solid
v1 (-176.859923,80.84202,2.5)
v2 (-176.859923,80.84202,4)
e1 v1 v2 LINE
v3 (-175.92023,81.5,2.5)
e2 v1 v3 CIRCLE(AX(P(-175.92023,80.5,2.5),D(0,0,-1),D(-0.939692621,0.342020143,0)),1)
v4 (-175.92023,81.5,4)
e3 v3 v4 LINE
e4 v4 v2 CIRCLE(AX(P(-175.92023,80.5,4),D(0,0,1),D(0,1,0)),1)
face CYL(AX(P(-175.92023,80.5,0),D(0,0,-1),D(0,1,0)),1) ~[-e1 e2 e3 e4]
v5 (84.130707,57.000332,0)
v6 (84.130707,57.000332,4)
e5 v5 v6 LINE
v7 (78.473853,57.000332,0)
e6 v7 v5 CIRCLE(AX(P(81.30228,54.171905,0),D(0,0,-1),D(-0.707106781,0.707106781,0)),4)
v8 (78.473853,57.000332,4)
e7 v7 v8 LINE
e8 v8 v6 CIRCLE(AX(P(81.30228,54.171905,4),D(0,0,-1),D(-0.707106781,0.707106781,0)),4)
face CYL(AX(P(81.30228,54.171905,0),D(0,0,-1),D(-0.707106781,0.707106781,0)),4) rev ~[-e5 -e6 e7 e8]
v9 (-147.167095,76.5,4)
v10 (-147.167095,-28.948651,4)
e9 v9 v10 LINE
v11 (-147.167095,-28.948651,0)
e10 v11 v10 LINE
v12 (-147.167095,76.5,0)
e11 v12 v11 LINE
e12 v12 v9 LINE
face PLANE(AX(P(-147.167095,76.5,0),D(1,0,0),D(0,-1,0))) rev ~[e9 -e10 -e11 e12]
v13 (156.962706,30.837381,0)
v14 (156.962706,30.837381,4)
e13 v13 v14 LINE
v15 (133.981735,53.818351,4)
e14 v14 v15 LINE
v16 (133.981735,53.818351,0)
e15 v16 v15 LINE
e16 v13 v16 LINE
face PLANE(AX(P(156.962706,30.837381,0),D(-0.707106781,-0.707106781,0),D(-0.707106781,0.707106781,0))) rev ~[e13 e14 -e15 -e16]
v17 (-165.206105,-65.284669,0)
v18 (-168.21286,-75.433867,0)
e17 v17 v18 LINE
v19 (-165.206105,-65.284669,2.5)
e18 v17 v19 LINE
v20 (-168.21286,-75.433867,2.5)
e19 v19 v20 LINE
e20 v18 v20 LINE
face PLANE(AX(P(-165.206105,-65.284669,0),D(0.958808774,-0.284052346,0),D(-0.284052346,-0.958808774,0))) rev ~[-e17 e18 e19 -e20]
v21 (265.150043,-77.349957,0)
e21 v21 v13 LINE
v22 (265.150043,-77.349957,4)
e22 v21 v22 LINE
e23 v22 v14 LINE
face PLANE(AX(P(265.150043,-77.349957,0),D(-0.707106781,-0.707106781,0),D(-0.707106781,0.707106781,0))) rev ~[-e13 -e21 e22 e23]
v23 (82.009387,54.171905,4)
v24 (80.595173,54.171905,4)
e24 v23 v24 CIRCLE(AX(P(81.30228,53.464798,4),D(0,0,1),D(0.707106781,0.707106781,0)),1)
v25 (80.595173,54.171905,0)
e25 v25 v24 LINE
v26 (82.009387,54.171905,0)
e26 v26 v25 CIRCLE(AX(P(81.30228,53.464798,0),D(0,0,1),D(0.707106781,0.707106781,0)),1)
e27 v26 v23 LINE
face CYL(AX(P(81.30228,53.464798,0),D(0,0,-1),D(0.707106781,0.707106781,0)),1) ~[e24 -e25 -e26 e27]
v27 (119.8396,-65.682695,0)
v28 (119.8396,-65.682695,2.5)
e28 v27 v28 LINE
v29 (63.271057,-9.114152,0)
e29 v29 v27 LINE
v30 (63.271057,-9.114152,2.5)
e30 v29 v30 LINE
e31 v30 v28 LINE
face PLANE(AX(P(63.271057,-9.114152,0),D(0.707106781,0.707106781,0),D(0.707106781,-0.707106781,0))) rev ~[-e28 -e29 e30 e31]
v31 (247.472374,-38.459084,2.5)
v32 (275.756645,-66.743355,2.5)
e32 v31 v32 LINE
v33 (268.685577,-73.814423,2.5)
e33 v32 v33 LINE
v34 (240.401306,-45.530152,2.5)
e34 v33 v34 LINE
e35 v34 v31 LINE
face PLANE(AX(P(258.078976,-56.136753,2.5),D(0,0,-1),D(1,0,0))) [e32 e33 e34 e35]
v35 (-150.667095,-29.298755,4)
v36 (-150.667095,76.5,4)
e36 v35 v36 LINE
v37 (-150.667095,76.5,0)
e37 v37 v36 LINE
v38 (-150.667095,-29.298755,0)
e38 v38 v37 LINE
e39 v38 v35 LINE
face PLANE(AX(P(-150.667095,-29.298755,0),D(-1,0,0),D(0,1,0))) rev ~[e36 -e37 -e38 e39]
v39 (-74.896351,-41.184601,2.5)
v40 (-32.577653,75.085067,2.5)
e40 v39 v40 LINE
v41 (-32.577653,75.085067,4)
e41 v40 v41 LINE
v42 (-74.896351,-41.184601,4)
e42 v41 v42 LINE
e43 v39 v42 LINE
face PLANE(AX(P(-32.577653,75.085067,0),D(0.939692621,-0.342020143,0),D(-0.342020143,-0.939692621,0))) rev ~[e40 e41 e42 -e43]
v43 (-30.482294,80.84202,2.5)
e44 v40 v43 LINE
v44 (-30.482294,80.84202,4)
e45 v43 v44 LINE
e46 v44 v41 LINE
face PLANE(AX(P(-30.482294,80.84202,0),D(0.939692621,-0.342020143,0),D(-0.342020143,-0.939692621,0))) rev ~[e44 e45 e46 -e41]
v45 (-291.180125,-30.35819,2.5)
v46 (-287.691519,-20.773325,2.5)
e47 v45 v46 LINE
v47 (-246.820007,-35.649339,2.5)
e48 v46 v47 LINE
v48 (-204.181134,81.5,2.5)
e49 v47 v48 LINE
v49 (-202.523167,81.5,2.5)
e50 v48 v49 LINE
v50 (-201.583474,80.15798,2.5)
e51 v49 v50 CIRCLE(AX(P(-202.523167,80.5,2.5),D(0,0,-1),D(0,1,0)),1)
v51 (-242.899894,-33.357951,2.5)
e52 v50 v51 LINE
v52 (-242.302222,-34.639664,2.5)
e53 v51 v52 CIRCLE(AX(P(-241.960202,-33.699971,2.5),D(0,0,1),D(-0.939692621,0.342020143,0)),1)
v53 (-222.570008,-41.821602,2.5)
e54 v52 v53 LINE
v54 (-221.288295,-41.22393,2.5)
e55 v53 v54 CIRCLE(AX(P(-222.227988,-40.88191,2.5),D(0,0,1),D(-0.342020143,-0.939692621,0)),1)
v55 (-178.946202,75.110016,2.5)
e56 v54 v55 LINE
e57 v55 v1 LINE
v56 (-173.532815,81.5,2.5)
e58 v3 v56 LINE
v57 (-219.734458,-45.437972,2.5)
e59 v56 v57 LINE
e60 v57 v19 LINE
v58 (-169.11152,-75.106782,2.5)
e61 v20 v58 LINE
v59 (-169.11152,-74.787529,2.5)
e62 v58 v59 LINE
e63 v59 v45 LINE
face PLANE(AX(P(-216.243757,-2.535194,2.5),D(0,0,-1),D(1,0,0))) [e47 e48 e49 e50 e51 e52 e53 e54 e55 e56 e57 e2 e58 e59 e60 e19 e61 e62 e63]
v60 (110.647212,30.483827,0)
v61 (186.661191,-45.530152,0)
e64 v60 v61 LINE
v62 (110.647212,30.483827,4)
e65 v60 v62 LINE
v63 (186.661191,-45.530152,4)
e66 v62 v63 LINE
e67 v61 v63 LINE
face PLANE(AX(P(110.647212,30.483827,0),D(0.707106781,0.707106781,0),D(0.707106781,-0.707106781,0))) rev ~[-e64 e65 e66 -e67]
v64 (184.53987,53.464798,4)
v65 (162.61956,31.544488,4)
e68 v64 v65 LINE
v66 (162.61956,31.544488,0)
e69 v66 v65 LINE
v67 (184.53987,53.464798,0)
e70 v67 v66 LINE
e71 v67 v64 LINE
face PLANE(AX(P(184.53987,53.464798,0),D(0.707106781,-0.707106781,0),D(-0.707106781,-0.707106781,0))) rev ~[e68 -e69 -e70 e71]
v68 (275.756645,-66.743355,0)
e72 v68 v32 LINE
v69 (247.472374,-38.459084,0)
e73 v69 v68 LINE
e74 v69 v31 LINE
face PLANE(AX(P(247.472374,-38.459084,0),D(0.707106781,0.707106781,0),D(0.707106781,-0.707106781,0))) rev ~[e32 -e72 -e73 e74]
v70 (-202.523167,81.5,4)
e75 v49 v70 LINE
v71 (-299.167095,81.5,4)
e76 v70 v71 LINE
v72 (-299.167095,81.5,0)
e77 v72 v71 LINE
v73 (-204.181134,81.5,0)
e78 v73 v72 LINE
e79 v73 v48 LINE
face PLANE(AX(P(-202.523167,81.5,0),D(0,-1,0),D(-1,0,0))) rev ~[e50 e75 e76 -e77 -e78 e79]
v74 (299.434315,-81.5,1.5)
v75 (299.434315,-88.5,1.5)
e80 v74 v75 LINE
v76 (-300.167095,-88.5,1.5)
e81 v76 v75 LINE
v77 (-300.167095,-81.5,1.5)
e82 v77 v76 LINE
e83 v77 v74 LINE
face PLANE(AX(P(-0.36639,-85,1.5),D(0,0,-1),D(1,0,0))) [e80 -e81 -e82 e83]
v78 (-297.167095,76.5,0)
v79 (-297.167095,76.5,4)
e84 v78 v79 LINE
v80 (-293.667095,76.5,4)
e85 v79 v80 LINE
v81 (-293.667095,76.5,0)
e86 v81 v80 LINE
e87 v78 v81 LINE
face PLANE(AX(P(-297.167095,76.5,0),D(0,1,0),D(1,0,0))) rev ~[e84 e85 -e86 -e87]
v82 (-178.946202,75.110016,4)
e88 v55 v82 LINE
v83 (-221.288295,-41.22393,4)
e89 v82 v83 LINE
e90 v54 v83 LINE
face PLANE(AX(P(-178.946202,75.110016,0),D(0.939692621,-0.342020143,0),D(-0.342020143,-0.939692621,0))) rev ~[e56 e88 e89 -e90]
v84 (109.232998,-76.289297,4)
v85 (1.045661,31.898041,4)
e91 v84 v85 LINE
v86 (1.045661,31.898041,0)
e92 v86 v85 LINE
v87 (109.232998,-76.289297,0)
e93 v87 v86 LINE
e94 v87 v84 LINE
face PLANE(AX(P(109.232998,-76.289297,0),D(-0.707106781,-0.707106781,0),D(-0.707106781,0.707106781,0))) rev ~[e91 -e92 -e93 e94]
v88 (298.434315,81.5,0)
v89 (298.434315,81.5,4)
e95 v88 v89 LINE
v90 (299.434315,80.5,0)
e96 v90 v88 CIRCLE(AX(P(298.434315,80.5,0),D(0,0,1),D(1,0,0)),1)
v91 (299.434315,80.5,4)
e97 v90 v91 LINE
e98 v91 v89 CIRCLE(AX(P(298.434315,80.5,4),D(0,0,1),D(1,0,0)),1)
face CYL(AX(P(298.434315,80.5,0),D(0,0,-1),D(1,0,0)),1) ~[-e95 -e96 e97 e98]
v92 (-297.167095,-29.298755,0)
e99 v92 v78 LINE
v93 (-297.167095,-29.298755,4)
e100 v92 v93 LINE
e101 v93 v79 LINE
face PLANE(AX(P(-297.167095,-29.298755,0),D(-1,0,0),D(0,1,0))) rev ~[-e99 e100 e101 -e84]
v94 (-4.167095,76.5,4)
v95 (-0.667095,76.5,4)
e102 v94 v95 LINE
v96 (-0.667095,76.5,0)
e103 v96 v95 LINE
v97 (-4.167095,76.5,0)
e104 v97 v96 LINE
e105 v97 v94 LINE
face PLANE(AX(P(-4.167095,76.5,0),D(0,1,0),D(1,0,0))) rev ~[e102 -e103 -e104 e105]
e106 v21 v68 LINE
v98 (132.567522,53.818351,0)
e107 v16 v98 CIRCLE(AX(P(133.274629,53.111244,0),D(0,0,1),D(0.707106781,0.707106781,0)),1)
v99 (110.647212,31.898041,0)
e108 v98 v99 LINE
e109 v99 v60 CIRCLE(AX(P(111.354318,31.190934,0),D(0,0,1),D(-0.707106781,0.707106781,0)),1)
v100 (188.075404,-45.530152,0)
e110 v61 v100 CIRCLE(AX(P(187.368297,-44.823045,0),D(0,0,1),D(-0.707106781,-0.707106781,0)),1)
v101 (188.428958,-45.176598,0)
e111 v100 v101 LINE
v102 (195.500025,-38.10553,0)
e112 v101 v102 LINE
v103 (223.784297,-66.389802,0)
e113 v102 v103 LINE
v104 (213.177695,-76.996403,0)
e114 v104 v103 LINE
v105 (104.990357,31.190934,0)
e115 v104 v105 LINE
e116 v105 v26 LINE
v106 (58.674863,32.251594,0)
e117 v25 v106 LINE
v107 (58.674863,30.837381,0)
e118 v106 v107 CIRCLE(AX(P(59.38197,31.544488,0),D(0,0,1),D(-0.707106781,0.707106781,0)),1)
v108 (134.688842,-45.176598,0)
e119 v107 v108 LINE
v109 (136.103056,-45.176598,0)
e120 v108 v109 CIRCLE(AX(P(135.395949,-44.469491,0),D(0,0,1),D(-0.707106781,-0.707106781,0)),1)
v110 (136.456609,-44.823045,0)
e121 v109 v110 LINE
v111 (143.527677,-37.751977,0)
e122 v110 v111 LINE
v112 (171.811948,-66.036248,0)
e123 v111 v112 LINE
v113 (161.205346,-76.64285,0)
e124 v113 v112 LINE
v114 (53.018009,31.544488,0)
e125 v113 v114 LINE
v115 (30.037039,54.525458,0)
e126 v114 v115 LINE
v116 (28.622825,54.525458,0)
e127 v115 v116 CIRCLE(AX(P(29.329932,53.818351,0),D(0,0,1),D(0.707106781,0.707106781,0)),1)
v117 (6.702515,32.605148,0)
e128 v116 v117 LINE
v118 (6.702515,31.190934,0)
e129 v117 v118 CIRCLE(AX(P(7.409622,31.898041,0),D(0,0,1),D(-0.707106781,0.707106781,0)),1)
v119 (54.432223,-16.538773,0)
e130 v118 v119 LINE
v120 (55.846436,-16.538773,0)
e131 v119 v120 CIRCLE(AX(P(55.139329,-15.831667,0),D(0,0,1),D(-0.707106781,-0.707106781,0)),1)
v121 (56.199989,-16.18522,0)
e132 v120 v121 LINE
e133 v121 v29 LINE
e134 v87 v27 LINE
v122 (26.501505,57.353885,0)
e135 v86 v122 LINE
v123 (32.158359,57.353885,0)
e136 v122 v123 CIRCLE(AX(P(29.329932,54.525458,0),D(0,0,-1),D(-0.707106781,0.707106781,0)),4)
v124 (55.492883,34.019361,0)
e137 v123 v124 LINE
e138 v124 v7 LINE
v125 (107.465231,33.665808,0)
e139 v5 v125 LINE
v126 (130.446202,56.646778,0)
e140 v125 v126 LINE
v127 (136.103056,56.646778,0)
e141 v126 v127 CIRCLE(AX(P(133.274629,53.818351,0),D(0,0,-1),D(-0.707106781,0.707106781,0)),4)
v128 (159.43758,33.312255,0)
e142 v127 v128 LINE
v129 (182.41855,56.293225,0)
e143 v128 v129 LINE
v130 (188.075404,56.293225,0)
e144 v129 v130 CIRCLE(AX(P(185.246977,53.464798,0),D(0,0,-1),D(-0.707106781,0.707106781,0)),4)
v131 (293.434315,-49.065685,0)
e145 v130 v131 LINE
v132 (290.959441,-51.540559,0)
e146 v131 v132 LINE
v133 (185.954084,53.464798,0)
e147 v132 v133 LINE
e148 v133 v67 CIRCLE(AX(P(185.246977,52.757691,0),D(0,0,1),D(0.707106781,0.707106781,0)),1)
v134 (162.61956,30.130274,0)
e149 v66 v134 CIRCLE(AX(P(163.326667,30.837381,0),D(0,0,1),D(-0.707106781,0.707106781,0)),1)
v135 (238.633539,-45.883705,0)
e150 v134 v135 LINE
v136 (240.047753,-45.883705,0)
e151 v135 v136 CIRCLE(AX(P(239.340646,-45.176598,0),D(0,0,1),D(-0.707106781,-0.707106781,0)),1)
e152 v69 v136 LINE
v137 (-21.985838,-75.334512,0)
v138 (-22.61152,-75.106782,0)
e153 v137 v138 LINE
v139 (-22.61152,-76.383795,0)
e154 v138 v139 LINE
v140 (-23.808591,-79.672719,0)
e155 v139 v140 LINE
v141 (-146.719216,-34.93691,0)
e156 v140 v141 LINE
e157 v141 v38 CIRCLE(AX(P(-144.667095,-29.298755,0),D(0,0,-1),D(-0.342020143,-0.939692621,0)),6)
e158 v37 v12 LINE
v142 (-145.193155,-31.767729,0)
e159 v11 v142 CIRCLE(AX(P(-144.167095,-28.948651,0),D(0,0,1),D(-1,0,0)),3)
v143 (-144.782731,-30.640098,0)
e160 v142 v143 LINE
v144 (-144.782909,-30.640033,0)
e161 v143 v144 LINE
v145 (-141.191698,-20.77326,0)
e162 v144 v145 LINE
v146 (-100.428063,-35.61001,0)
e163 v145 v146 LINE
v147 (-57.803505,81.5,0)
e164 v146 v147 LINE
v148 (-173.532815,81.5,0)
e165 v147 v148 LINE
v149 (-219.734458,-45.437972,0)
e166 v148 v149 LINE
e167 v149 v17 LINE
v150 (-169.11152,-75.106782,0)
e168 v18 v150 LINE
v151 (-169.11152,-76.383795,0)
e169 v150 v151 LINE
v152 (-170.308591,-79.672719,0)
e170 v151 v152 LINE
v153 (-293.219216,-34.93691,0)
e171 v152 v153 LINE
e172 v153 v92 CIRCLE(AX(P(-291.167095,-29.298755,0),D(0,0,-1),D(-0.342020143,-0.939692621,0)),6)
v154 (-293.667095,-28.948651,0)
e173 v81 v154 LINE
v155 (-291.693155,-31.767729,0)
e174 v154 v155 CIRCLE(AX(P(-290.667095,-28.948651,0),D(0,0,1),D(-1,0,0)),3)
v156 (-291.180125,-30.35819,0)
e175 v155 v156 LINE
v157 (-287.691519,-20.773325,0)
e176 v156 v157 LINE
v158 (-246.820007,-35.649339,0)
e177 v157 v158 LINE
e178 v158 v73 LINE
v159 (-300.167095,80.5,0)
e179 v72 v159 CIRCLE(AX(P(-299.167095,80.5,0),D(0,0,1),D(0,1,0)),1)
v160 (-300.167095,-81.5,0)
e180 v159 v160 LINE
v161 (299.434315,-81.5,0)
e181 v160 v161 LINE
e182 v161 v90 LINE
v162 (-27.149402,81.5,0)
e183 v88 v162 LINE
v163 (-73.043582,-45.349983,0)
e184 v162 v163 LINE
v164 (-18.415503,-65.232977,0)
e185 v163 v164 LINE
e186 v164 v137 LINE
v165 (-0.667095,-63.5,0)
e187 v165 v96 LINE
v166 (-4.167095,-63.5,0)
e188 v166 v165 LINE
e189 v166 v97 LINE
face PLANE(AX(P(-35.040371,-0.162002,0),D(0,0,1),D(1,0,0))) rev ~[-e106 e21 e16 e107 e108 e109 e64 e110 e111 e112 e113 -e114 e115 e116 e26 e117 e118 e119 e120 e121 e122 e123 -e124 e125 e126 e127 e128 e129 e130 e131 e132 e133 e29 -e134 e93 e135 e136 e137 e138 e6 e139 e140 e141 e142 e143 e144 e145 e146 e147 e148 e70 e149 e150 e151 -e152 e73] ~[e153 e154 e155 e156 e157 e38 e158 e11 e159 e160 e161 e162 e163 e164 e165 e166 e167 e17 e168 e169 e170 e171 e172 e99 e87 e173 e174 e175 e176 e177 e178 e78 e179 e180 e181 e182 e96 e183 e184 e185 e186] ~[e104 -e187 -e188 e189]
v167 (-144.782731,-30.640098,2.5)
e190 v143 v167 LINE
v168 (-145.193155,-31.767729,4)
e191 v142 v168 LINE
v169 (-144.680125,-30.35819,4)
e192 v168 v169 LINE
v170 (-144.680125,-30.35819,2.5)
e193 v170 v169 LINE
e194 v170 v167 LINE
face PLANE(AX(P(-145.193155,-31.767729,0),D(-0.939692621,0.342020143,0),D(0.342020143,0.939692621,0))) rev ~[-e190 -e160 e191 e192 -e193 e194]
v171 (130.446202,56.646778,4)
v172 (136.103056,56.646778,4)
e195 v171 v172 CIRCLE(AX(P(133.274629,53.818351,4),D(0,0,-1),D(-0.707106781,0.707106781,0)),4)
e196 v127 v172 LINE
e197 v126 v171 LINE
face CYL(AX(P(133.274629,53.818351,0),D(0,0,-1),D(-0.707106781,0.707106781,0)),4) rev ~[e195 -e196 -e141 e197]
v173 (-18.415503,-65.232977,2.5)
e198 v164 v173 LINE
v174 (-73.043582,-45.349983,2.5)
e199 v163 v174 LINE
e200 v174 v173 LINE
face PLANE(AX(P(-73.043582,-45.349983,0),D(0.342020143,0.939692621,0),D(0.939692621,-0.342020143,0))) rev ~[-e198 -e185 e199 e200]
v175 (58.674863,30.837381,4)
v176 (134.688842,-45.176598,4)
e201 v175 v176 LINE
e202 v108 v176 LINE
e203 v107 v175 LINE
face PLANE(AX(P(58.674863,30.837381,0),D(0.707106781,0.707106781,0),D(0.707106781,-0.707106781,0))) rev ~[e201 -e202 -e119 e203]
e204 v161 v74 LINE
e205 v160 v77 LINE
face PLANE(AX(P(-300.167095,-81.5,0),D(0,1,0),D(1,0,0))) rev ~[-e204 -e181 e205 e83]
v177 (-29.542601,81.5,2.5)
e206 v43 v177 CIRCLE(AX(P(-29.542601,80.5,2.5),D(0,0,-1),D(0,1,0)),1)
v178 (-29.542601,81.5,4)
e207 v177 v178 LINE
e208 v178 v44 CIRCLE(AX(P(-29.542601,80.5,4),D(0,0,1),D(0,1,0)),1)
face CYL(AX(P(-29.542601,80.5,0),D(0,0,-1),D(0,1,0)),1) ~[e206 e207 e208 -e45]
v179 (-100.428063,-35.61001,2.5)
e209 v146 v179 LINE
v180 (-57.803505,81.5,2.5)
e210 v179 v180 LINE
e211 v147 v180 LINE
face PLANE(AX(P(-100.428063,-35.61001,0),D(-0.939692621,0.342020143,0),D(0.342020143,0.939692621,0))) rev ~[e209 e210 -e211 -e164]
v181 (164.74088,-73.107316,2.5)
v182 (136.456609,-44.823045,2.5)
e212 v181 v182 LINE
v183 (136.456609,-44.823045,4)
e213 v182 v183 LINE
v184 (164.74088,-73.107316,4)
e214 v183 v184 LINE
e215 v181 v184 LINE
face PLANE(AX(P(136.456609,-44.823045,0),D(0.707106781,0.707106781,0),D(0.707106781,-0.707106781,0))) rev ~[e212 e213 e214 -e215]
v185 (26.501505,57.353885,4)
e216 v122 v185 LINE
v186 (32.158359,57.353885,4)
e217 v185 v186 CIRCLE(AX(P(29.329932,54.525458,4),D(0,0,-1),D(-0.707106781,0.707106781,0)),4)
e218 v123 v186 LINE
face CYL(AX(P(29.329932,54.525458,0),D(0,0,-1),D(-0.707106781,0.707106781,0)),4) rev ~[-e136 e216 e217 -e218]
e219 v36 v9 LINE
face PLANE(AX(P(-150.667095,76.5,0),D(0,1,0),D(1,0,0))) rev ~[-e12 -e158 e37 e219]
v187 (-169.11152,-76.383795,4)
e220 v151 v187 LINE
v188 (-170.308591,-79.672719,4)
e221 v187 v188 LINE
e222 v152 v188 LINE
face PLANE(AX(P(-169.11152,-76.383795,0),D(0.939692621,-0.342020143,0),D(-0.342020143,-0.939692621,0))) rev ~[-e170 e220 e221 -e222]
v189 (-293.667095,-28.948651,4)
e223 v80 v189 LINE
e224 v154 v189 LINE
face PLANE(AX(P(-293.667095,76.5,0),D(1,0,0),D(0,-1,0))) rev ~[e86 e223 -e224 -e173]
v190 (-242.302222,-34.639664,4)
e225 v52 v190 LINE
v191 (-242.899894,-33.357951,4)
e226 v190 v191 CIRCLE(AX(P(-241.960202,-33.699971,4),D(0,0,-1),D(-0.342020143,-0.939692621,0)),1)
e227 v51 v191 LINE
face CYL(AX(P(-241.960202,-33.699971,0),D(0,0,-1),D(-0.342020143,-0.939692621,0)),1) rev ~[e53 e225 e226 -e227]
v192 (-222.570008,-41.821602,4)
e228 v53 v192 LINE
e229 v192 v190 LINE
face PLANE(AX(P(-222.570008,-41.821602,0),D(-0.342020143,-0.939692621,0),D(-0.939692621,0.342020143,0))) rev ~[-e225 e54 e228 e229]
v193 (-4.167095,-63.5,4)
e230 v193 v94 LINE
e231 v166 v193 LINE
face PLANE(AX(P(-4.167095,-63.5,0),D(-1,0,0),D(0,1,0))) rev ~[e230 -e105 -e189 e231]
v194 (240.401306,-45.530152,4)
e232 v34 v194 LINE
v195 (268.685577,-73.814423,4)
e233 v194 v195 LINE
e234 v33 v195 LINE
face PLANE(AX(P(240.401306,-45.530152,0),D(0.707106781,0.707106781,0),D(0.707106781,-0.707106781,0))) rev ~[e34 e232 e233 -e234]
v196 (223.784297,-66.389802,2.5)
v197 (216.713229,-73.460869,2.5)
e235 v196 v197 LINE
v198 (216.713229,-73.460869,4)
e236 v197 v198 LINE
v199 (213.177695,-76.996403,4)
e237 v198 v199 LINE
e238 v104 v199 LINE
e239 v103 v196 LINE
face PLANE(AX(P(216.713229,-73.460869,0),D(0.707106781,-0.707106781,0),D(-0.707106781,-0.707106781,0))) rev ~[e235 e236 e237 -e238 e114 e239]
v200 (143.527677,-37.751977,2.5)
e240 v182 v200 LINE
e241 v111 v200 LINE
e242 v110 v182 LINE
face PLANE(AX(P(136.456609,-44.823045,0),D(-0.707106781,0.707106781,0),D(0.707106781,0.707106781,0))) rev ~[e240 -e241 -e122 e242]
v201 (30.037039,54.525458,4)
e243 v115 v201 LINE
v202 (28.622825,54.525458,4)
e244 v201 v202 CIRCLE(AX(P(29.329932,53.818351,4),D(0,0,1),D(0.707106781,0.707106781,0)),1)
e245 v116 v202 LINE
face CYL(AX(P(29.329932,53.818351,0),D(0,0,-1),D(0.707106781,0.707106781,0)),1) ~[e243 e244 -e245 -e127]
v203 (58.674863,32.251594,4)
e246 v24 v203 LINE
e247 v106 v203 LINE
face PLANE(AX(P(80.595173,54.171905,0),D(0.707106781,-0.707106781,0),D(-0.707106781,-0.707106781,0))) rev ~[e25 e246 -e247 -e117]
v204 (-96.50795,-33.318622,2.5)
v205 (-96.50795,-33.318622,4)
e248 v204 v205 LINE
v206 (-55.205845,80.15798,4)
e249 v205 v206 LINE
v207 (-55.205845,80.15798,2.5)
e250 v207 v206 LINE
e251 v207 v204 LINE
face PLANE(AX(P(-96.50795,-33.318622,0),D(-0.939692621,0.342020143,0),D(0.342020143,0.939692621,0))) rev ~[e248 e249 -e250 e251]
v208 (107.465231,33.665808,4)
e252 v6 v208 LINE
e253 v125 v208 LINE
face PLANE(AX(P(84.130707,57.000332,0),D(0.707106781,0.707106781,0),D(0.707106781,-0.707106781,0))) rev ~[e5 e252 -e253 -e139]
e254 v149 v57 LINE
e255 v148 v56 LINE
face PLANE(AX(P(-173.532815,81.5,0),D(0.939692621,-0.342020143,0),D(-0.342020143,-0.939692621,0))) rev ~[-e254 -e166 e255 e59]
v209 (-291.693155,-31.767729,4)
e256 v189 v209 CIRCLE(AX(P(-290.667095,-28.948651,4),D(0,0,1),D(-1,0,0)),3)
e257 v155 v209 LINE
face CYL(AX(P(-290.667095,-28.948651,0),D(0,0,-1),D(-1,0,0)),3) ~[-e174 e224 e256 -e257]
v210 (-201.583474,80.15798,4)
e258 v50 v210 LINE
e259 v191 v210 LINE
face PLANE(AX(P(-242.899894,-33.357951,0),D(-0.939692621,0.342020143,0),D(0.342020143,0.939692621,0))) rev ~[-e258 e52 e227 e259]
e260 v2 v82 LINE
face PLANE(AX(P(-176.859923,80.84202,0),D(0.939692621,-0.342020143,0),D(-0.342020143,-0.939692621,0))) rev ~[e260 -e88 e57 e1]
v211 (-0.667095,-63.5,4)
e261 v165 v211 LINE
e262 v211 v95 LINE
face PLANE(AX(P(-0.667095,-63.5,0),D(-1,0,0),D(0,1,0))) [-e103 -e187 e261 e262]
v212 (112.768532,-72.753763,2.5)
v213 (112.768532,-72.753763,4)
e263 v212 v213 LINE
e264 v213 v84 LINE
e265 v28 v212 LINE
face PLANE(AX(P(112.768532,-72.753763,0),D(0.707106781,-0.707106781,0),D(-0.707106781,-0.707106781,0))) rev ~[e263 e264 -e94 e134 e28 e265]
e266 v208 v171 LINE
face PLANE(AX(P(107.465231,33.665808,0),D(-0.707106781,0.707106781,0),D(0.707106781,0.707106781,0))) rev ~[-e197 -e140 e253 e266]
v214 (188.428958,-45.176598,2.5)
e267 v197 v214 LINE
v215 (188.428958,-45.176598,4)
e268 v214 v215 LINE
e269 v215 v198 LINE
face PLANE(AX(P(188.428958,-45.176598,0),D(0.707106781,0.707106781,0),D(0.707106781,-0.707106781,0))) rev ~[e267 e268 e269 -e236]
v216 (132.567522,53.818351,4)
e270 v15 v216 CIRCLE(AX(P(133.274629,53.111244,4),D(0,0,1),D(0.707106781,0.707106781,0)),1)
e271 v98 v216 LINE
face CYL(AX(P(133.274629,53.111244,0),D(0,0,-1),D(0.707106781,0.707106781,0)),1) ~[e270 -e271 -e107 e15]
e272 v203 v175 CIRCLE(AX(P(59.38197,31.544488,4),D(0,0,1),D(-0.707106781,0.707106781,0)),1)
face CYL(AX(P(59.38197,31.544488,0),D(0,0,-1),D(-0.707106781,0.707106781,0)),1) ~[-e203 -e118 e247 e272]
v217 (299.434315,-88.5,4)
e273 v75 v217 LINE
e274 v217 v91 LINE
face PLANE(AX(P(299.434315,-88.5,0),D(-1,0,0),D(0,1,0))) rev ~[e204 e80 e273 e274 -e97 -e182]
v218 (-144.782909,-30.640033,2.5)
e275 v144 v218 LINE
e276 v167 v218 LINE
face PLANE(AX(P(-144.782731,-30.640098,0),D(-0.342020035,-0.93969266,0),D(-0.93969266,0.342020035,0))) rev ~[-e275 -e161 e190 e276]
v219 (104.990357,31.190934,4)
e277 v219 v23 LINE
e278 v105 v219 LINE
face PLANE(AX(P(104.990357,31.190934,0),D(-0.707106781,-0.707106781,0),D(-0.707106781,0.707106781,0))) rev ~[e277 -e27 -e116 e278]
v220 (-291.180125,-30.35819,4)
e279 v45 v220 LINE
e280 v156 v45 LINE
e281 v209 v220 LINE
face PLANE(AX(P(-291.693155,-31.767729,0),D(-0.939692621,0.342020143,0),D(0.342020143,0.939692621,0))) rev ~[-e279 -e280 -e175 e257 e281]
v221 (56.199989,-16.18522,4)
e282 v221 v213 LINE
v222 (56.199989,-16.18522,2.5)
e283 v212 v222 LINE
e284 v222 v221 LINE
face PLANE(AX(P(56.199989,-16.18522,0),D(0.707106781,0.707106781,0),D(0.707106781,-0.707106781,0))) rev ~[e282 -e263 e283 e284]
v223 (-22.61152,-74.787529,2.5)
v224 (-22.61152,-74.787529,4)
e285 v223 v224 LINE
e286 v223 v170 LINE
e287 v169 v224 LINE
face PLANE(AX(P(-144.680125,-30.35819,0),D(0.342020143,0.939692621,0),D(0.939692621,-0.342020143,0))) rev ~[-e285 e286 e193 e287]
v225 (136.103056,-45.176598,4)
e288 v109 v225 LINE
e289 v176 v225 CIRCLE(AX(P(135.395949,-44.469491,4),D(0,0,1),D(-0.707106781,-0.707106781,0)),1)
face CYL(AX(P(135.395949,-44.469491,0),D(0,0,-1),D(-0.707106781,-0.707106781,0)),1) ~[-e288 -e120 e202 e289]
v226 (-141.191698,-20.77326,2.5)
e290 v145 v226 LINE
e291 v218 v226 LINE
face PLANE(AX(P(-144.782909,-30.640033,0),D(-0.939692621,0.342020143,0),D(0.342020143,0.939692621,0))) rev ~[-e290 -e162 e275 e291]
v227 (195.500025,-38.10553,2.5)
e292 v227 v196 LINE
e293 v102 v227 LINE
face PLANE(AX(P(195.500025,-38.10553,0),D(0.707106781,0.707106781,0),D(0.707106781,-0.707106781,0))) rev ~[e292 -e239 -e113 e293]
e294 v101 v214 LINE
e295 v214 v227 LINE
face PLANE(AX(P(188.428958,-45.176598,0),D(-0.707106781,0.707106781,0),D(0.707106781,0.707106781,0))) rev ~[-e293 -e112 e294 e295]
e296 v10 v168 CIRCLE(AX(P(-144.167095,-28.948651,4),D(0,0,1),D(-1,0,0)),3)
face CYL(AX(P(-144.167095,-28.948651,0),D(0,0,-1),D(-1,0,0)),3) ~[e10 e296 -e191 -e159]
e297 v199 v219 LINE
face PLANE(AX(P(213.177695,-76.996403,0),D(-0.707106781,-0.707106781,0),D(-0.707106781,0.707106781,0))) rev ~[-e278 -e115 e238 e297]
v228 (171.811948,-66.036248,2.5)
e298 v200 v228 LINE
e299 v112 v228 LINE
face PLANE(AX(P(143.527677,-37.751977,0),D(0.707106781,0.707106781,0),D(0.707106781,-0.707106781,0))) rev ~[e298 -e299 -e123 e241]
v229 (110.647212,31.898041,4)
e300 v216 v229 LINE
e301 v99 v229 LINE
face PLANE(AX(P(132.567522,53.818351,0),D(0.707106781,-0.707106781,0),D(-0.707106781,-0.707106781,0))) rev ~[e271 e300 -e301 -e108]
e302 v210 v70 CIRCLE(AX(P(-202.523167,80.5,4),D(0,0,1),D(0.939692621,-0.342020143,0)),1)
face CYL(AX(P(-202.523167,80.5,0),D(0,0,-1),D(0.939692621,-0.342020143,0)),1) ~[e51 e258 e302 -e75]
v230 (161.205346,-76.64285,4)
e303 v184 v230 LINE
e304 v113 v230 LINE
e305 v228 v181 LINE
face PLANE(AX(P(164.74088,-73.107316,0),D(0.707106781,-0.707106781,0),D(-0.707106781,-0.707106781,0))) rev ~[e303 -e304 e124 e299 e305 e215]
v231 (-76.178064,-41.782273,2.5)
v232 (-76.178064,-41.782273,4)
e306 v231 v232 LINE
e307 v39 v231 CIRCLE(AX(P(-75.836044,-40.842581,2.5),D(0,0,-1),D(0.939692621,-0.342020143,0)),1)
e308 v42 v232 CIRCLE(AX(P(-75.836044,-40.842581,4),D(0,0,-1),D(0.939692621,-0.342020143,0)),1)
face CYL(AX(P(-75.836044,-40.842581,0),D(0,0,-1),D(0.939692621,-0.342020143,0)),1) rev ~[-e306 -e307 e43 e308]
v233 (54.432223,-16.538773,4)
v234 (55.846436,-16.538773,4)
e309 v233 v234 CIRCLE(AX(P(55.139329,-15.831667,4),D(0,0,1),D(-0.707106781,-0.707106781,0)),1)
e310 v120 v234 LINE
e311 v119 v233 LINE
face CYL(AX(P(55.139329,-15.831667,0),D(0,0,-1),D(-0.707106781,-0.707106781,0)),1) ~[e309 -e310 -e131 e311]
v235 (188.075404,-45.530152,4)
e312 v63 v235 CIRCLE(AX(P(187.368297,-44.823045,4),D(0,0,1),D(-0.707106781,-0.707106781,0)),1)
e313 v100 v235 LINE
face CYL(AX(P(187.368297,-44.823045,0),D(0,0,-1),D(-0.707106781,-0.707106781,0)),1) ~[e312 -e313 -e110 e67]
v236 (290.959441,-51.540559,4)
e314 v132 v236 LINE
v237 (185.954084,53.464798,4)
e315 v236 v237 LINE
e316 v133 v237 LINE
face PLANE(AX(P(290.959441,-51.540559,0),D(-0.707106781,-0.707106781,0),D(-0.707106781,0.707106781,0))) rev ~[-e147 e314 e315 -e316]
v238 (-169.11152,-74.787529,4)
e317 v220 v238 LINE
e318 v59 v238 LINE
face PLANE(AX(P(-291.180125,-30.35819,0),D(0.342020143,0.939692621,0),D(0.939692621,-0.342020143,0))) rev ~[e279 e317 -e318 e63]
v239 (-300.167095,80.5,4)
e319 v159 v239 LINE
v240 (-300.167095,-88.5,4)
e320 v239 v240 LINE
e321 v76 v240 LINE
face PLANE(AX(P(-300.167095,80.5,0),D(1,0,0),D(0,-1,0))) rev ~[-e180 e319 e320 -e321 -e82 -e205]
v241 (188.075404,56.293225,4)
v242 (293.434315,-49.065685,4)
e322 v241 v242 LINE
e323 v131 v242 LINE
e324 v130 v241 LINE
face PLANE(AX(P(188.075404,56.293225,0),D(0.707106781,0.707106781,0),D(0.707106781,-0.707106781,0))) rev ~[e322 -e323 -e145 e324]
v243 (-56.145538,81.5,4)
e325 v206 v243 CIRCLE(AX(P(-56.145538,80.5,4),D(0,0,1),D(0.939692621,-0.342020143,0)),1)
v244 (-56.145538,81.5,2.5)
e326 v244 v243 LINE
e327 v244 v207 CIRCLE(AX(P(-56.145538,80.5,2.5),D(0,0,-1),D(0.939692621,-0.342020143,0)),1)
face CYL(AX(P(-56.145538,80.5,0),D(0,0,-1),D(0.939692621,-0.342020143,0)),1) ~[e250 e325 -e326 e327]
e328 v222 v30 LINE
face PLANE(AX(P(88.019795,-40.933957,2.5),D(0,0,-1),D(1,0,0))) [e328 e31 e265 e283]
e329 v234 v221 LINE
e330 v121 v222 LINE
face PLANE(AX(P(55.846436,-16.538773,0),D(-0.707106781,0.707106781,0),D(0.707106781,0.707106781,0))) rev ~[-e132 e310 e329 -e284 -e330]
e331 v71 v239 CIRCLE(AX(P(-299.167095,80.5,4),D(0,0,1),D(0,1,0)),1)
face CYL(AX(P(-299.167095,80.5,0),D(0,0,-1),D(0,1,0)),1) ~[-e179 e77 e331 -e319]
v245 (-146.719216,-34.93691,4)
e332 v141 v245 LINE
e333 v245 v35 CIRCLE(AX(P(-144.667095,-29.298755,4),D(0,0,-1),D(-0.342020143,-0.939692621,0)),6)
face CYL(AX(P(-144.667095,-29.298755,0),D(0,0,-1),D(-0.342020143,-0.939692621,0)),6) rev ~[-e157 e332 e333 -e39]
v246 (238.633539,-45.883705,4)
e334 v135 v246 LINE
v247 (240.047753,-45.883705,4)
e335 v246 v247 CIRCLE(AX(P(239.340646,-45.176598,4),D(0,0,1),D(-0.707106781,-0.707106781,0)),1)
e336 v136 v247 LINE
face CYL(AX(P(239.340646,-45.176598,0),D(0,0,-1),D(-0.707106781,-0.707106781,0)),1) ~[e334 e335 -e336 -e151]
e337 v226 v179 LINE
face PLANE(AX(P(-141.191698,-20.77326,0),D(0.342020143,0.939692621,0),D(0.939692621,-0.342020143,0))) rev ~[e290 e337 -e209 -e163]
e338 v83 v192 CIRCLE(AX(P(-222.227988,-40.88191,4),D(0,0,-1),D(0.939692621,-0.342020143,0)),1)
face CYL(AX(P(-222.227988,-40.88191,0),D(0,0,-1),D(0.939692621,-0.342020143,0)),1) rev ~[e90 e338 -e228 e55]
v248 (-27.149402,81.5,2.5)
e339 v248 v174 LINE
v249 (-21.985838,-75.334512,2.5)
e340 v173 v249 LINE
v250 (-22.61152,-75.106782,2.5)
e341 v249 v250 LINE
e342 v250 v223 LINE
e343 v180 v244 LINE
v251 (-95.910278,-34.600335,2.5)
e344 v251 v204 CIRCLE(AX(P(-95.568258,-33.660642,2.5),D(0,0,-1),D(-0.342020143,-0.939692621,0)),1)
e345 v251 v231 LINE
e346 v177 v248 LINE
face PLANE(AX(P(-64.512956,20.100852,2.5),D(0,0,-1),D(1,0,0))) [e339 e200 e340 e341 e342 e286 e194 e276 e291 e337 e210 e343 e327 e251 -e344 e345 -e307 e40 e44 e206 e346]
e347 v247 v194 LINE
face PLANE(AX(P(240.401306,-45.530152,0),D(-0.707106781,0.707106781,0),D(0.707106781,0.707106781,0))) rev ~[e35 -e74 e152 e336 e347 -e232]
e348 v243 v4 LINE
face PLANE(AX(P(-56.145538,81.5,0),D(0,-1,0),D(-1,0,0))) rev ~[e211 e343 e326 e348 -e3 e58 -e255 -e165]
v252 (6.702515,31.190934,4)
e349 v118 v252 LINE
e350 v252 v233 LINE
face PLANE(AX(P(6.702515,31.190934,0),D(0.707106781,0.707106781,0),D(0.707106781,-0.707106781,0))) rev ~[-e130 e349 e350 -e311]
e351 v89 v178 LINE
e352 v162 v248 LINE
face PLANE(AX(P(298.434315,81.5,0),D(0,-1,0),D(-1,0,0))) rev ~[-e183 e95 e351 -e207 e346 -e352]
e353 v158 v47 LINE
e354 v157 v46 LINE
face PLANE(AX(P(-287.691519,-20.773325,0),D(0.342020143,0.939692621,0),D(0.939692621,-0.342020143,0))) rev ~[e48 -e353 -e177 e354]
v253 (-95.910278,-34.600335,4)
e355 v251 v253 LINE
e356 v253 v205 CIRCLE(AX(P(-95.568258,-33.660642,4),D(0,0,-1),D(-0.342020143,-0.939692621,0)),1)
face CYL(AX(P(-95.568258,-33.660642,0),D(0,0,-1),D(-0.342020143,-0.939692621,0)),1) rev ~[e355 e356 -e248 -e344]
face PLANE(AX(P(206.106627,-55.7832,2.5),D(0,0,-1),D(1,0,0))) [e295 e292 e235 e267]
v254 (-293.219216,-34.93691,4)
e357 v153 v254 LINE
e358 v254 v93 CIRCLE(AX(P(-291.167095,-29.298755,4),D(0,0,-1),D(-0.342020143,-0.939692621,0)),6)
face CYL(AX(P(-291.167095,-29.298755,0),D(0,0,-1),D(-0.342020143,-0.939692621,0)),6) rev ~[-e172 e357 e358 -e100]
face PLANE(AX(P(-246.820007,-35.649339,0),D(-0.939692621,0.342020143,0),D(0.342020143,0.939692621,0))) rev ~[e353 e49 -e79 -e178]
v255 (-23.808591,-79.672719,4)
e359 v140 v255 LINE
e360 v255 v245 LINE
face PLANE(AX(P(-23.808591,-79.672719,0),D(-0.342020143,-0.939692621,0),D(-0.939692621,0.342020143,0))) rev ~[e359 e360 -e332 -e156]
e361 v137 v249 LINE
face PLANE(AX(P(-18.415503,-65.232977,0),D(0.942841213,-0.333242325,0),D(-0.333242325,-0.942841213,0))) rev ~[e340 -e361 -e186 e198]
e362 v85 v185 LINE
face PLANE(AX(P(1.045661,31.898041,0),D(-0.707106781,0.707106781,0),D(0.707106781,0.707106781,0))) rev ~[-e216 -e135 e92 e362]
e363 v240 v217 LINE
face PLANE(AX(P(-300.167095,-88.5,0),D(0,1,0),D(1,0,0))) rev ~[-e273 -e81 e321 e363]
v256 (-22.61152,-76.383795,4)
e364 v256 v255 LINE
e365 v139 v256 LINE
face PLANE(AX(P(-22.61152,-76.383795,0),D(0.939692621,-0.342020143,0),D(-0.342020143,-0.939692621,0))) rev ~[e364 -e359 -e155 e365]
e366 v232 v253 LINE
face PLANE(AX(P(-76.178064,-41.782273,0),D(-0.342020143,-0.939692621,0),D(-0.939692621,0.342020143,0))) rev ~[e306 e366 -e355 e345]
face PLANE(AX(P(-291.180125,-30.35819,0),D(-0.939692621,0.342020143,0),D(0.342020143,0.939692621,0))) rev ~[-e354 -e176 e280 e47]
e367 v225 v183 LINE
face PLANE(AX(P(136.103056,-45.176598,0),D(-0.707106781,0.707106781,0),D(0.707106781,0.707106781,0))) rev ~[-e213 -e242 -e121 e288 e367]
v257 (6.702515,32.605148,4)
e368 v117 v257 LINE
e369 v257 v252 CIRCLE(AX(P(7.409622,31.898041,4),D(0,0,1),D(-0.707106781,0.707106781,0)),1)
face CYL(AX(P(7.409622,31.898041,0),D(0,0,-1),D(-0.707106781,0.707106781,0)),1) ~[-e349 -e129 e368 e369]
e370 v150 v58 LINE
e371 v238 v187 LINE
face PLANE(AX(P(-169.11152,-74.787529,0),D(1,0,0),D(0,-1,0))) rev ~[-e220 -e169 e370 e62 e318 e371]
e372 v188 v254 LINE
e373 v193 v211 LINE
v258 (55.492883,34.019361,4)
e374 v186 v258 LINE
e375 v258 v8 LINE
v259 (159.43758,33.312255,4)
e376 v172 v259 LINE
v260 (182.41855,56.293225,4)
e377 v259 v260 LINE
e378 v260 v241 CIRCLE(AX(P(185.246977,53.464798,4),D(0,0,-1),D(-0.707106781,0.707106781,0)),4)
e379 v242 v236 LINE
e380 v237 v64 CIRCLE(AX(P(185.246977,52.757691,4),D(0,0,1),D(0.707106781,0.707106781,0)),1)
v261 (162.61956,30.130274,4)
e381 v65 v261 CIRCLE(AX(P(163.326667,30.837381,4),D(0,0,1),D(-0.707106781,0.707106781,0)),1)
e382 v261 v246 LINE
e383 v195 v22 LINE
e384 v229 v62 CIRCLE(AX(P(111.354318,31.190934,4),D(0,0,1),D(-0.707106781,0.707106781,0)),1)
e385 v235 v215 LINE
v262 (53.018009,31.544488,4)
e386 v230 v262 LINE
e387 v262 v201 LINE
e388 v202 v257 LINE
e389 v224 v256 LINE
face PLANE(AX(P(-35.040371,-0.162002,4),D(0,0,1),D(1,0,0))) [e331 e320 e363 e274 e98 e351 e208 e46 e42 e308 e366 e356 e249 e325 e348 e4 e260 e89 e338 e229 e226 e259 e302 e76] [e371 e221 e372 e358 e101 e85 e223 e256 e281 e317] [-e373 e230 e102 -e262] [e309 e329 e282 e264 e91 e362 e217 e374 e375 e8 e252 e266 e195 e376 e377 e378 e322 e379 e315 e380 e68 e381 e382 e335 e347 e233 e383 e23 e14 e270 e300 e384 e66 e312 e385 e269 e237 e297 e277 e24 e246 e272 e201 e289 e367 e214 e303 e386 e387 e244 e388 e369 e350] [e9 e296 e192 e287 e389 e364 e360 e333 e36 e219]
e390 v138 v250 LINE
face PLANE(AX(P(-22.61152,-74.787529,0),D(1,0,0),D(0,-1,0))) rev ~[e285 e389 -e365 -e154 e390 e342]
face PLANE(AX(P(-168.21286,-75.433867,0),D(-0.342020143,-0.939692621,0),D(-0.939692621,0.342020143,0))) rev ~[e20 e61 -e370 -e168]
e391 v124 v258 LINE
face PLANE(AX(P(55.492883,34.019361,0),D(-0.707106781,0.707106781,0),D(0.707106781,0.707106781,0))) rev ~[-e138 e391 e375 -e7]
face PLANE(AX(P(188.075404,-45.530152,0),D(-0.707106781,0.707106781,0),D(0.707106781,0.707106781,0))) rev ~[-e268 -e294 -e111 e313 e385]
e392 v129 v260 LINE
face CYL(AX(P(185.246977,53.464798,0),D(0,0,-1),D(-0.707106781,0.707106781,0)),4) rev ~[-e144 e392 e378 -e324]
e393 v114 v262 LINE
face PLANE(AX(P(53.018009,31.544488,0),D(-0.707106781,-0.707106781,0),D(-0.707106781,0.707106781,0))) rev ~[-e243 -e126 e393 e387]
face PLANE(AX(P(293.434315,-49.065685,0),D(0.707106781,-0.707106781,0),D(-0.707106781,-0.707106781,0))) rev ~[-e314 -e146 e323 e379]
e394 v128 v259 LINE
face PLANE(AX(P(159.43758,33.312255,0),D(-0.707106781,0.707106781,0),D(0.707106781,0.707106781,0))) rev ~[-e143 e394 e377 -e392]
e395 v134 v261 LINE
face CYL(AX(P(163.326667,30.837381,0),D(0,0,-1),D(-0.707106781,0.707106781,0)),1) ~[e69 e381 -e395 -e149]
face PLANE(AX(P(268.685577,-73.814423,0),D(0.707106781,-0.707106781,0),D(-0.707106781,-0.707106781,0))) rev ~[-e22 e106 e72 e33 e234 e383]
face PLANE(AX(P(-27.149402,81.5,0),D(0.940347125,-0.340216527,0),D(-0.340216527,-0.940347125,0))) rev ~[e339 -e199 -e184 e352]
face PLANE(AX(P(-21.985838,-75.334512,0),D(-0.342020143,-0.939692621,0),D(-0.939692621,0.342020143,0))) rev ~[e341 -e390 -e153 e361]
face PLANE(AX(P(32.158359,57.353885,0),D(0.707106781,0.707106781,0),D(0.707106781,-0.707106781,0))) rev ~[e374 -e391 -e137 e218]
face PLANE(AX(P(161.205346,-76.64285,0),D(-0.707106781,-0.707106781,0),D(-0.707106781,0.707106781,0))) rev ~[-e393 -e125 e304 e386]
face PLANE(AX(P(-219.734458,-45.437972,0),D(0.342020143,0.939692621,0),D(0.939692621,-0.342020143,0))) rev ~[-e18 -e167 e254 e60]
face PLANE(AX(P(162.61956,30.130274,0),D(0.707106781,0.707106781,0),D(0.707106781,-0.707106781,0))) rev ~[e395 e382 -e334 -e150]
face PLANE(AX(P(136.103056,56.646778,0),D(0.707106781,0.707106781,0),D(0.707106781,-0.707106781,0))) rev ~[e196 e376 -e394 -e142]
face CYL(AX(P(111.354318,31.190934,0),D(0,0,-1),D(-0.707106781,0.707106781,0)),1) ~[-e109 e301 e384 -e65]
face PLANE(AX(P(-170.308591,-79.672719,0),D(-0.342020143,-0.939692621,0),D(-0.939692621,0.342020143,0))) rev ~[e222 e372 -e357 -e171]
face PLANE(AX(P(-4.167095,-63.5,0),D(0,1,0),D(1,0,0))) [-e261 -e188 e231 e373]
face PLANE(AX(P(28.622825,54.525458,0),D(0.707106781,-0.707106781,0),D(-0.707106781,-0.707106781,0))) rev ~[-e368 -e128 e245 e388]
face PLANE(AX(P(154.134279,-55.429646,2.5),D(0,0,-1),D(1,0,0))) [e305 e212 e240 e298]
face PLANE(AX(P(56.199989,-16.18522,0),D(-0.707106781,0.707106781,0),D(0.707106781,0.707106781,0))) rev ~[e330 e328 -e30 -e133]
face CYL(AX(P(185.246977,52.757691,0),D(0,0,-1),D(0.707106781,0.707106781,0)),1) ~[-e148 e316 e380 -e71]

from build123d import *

# Parameters (mm, degrees)
F0_W     = 3.5
F0_H     = 140
F1_DEPTH = 4
F3_DEPTH = 2.5
F2_W     = 599.6014092535
F2_H     = 7
F4_DEPTH = 1.5


# Not quite as in the source:
# - a feature names something its author has since deleted; it is built from what else it names


with BuildPart() as f1:
    # F0 (on Top) → F1 (new body)
    with BuildSketch(Plane.XY):
        with BuildLine():
            Line((-300.1670946785, -88.5), (299.4343145751, -88.5))
            Line((299.4343145751, -88.5), (299.4343145751, 80.5))
            ThreePointArc((299.4343145751, 80.5), (299.1414213562, 81.2071067812), (298.4343145751, 81.5))
            Line((298.4343145751, 81.5), (-29.5426009536, 81.5))
            ThreePointArc((-29.5426009536, 81.5), (-30.1161773899, 81.3191520443), (-30.4822935744, 80.8420201433))
            Line((-30.4822935744, 80.8420201433), (-32.577653202, 75.0850668809))
            Line((-32.577653202, 75.0850668809), (-74.89635139, -41.1846008115))
            ThreePointArc((-74.89635139, -41.1846008115), (-75.413425749, -41.7488884552), (-76.1780641541, -41.7822732889))
            Line((-76.1780641541, -41.7822732889), (-95.9102779047, -34.6003348275))
            ThreePointArc((-95.9102779047, -34.6003348275), (-96.4745655484, -34.0832604685), (-96.5079503821, -33.3186220634))
            Line((-96.5079503821, -33.3186220634), (-55.2058449976, 80.1579798567))
            ThreePointArc((-55.2058449976, 80.1579798567), (-55.3263855741, 81.0735764364), (-56.1455376183, 81.5))
            Line((-56.1455376183, 81.5), (-175.9202302026, 81.5))
            ThreePointArc((-175.9202302026, 81.5), (-176.4938066389, 81.3191520443), (-176.8599228233, 80.8420201433))
            Line((-176.8599228233, 80.8420201433), (-178.9462015538, 75.1100164406))
            Line((-178.9462015538, 75.1100164406), (-221.2882952976, -41.2239300127))
            ThreePointArc((-221.2882952976, -41.2239300127), (-221.8053696566, -41.7882176564), (-222.5700080617, -41.8216024902))
            Line((-222.5700080617, -41.8216024902), (-242.3022218123, -34.6396640288))
            ThreePointArc((-242.3022218123, -34.6396640288), (-242.866509456, -34.1225896697), (-242.8998942897, -33.3579512647))
            Line((-242.8998942897, -33.3579512647), (-201.5834742465, 80.1579798567))
            ThreePointArc((-201.5834742465, 80.1579798567), (-201.704014823, 81.0735764364), (-202.5231668673, 81.5))
            Line((-202.5231668673, 81.5), (-299.1670946785, 81.5))
            ThreePointArc((-299.1670946785, 81.5), (-299.8742014597, 81.2071067812), (-300.1670946785, 80.5))
            Line((-300.1670946785, 80.5), (-300.1670946785, -88.5))
        make_face()
        with BuildLine():
            ThreePointArc((182.4185499288, 56.2932249718), (185.2469770535, 57.4647978471), (188.0754041783, 56.2932249718))
            Line((188.0754041783, 56.2932249718), (293.4343145751, -49.0656854249))
            Line((293.4343145751, -49.0656854249), (290.9594408409, -51.5405591591))
            Line((290.9594408409, -51.5405591591), (185.9540838347, 53.4647978471))
            ThreePointArc((185.9540838347, 53.4647978471), (185.2469770535, 53.7576910659), (184.5398702723, 53.4647978471))
            Line((184.5398702723, 53.4647978471), (162.6195600555, 31.5444876303))
            ThreePointArc((162.6195600555, 31.5444876303), (162.3266668367, 30.8373808491), (162.6195600555, 30.1302740679))
            Line((162.6195600555, 30.1302740679), (238.6335390331, -45.8837049096))
            ThreePointArc((238.6335390331, -45.8837049096), (239.3406458143, -46.1765981284), (240.0477525955, -45.8837049096))
            Line((240.0477525955, -45.8837049096), (240.4013059861, -45.530151519))
            Line((240.4013059861, -45.530151519), (268.6855772335, -73.8144227665))
            Line((268.6855772335, -73.8144227665), (267.6249170617, -74.8750829383))
            Line((267.6249170617, -74.8750829383), (265.1500433276, -77.3499566724))
            Line((265.1500433276, -77.3499566724), (156.962705806, 30.8373808491))
            Line((156.962705806, 30.8373808491), (133.9817354175, 53.8183512377))
            ThreePointArc((133.9817354175, 53.8183512377), (133.2746286363, 54.1112444565), (132.5675218551, 53.8183512377))
            Line((132.5675218551, 53.8183512377), (110.6472116383, 31.8980410209))
            ThreePointArc((110.6472116383, 31.8980410209), (110.3543184195, 31.1909342397), (110.6472116383, 30.4838274585))
            Line((110.6472116383, 30.4838274585), (186.6611906159, -45.530151519))
            ThreePointArc((186.6611906159, -45.530151519), (187.3682973971, -45.8230447378), (188.0754041783, -45.530151519))
            Line((188.0754041783, -45.530151519), (188.4289575688, -45.1765981284))
            Line((188.4289575688, -45.1765981284), (216.7132288163, -73.4608693759))
            Line((216.7132288163, -73.4608693759), (215.6525686445, -74.5215295477))
            Line((215.6525686445, -74.5215295477), (213.1776949104, -76.9964032818))
            Line((213.1776949104, -76.9964032818), (104.9903573888, 31.1909342397))
            Line((104.9903573888, 31.1909342397), (82.0093870003, 54.1719046283))
            ThreePointArc((82.0093870003, 54.1719046283), (81.3022802191, 54.4647978471), (80.5951734379, 54.1719046283))
            Line((80.5951734379, 54.1719046283), (58.6748632211, 32.2515944115))
            ThreePointArc((58.6748632211, 32.2515944115), (58.3819700023, 31.5444876303), (58.6748632211, 30.8373808491))
            Line((58.6748632211, 30.8373808491), (134.6888421987, -45.1765981284))
            ThreePointArc((134.6888421987, -45.1765981284), (135.3959489799, -45.4694913472), (136.103055761, -45.1765981284))
            Line((136.103055761, -45.1765981284), (136.4566091516, -44.8230447378))
            Line((136.4566091516, -44.8230447378), (164.7408803991, -73.1073159853))
            Line((164.7408803991, -73.1073159853), (163.6802202273, -74.1679761571))
            Line((163.6802202273, -74.1679761571), (161.2053464932, -76.6428498912))
            Line((161.2053464932, -76.6428498912), (53.0180089716, 31.5444876303))
            Line((53.0180089716, 31.5444876303), (30.0370385831, 54.5254580189))
            ThreePointArc((30.0370385831, 54.5254580189), (29.3299318019, 54.8183512377), (28.6228250207, 54.5254580189))
            Line((28.6228250207, 54.5254580189), (6.7025148039, 32.6051478021))
            ThreePointArc((6.7025148039, 32.6051478021), (6.4096215851, 31.8980410209), (6.7025148039, 31.1909342397))
            Line((6.7025148039, 31.1909342397), (54.432222534, -16.5387734904))
            ThreePointArc((54.432222534, -16.5387734904), (55.1393293152, -16.8316667092), (55.8464360964, -16.5387734904))
            Line((55.8464360964, -16.5387734904), (56.199989487, -16.1852200998))
            Line((56.199989487, -16.1852200998), (112.7685319819, -72.7537625947))
            Line((112.7685319819, -72.7537625947), (111.7078718101, -73.8144227665))
            Line((111.7078718101, -73.8144227665), (109.232998076, -76.2892965006))
            Line((109.232998076, -76.2892965006), (1.0456605544, 31.8980410209))
            Line((1.0456605544, 31.8980410209), (26.5015046771, 57.3538851436))
            ThreePointArc((26.5015046771, 57.3538851436), (29.3299318019, 58.5254580189), (32.1583589266, 57.3538851436))
            Line((32.1583589266, 57.3538851436), (55.4928827058, 34.0193613645))
            Line((55.4928827058, 34.0193613645), (78.4738530943, 57.000331753))
            ThreePointArc((78.4738530943, 57.000331753), (81.3022802191, 58.1719046283), (84.1307073438, 57.000331753))
            Line((84.1307073438, 57.000331753), (107.465231123, 33.6658079739))
            Line((107.465231123, 33.6658079739), (130.4462015116, 56.6467783624))
            ThreePointArc((130.4462015116, 56.6467783624), (133.2746286363, 57.8183512377), (136.103055761, 56.6467783624))
            Line((136.103055761, 56.6467783624), (159.4375795402, 33.3122545833))
            Line((159.4375795402, 33.3122545833), (182.4185499288, 56.2932249718))
        make_face(mode=Mode.SUBTRACT)
        with BuildLine():
            Line((-297.1670946785, -29.2987547707), (-297.1670946785, 76.5))
            Line((-297.1670946785, 76.5), (-293.6670946785, 76.5))
            Line((-293.6670946785, 76.5), (-293.6670946785, -28.9486510016))
            ThreePointArc((-293.6670946785, -28.9486510016), (-293.1245508114, -30.6693803107), (-291.6931551085, -31.767728864))
            Line((-291.6931551085, -31.767728864), (-291.1801248935, -30.3581899328))
            Line((-291.1801248935, -30.3581899328), (-247.9542643373, -46.0911165258))
            Line((-247.9542643373, -46.0911165258), (-216.0047152306, -57.7198013989))
            Line((-216.0047152306, -57.7198013989), (-169.1115203708, -74.7875285175))
            Line((-169.1115203708, -74.7875285175), (-169.1115203708, -76.3837951762))
            Line((-169.1115203708, -76.3837951762), (-170.3085908724, -79.672719349))
            Line((-170.3085908724, -79.672719349), (-293.2192155384, -34.9369104955))
            ThreePointArc((-293.2192155384, -34.9369104955), (-296.0820069442, -32.7402133888), (-297.1670946785, -29.2987547707))
        make_face(mode=Mode.SUBTRACT)
        with BuildLine():
            Line((-150.6670946785, -29.2987547707), (-150.6670946785, 76.5))
            Line((-150.6670946785, 76.5), (-147.1670946785, 76.5))
            Line((-147.1670946785, 76.5), (-147.1670946785, -28.9486510016))
            ThreePointArc((-147.1670946785, -28.9486510016), (-146.6245508114, -30.6693803107), (-145.1931551085, -31.767728864))
            Line((-145.1931551085, -31.767728864), (-144.6801248935, -30.3581899328))
            Line((-144.6801248935, -30.3581899328), (-101.4542643373, -46.0911165258))
            Line((-101.4542643373, -46.0911165258), (-69.5047152306, -57.7198013989))
            Line((-69.5047152306, -57.7198013989), (-22.6115203708, -74.7875285175))
            Line((-22.6115203708, -74.7875285175), (-22.6115203708, -76.3837951762))
            Line((-22.6115203708, -76.3837951762), (-23.8085908724, -79.672719349))
            Line((-23.8085908724, -79.672719349), (-146.7192155384, -34.9369104955))
            ThreePointArc((-146.7192155384, -34.9369104955), (-149.5820069442, -32.7402133888), (-150.6670946785, -29.2987547707))
        make_face(mode=Mode.SUBTRACT)
        with Locations((-2.4170946785, 6.5)):
            Rectangle(F0_W, F0_H, mode=Mode.SUBTRACT)
    extrude(amount=F1_DEPTH)

    # F2 (on face) → F3 (cut)
    with BuildSketch(Plane(origin=(0, 0, 0), x_dir=(1, 0, 0), z_dir=(0, 0, -1))):
        Polygon((275.7566450454, 66.7433549546), (268.6855772335, 73.8144227665), (240.4013059861, 45.530151519), (247.4723737979, 38.4590837072), align=None)
        Polygon((216.7132288163, 73.4608693759), (188.4289575688, 45.1765981284), (195.5000253807, 38.1055303166), (223.7842966282, 66.389801564), align=None)
        Polygon((164.7408803991, 73.1073159853), (136.4566091516, 44.8230447378), (143.5276769635, 37.751976926), (171.811948211, 66.0362481734), align=None)
        Polygon((119.8395997938, 65.6826947828), (112.7685319819, 72.7537625947), (56.199989487, 16.1852200998), (63.2710572988, 9.1141522879), align=None)
        with BuildLine():
            Line((-26.1847247522, -84.1663356758), (-27.1494019864, -81.5))
            Line((-27.1494019864, -81.5), (-29.5426009536, -81.5))
            ThreePointArc((-29.5426009536, -81.5), (-30.1161773899, -81.3191520443), (-30.4822935744, -80.8420201433))
            Line((-30.4822935744, -80.8420201433), (-74.89635139, 41.1846008115))
            ThreePointArc((-74.89635139, 41.1846008115), (-75.413425749, 41.7488884552), (-76.1780641541, 41.7822732889))
            Line((-76.1780641541, 41.7822732889), (-95.9102779047, 34.6003348275))
            ThreePointArc((-95.9102779047, 34.6003348275), (-96.4745655484, 34.0832604685), (-96.5079503821, 33.3186220634))
            Line((-96.5079503821, 33.3186220634), (-55.2058449976, -80.1579798567))
            ThreePointArc((-55.2058449976, -80.1579798567), (-55.3263855741, -81.0735764364), (-56.1455376183, -81.5))
            Line((-56.1455376183, -81.5), (-57.8035051482, -81.5))
            Line((-57.8035051482, -81.5), (-56.1411243122, -86.0673538194))
            Line((-56.1411243122, -86.0673538194), (-53.1341079256, -84.9728893607))
            Line((-53.1341079256, -84.9728893607), (-96.2260425959, 33.4212281064))
            Line((-96.2260425959, 33.4212281064), (-75.1769278903, 41.0824793169))
            Line((-75.1769278903, 41.0824793169), (-29.193835551, -85.2550285621))
            Line((-29.193835551, -85.2550285621), (-26.1847247522, -84.1663356758))
        make_face()
        with BuildLine():
            Line((-29.5426009536, -81.5), (-27.1494019864, -81.5))
            Line((-27.1494019864, -81.5), (-73.0435823042, 45.3499825234))
            Line((-73.0435823042, 45.3499825234), (-18.4155032039, 65.2329772711))
            Line((-18.4155032039, 65.2329772711), (-21.9858379993, 75.3345116245))
            Line((-21.9858379993, 75.3345116245), (-22.6115203708, 75.1067818652))
            Line((-22.6115203708, 75.1067818652), (-22.6115203708, 74.7875285175))
            Line((-22.6115203708, 74.7875285175), (-144.6801248935, 30.3581899328))
            Line((-144.6801248935, 30.3581899328), (-144.7827309416, 30.6400977331))
            Line((-144.7827309416, 30.6400977331), (-144.7829091425, 30.6400328733))
            Line((-144.7829091425, 30.6400328733), (-141.1916976375, 20.7732603551))
            Line((-141.1916976375, 20.7732603551), (-100.4280628419, 35.6100100293))
            Line((-100.4280628419, 35.6100100293), (-57.8035051482, -81.5))
            Line((-57.8035051482, -81.5), (-56.1455376183, -81.5))
            ThreePointArc((-56.1455376183, -81.5), (-55.3263855741, -81.0735764364), (-55.2058449976, -80.1579798567))
            Line((-55.2058449976, -80.1579798567), (-96.5079503821, 33.3186220634))
            ThreePointArc((-96.5079503821, 33.3186220634), (-96.4745655484, 34.0832604685), (-95.9102779047, 34.6003348275))
            Line((-95.9102779047, 34.6003348275), (-76.1780641541, 41.7822732889))
            ThreePointArc((-76.1780641541, 41.7822732889), (-75.413425749, 41.7488884552), (-74.89635139, 41.1846008115))
            Line((-74.89635139, 41.1846008115), (-30.4822935744, -80.8420201433))
            ThreePointArc((-30.4822935744, -80.8420201433), (-30.1161773899, -81.3191520443), (-29.5426009536, -81.5))
        make_face()
        with BuildLine():
            Line((-246.8200068386, 35.6493392141), (-204.1811344008, -81.5))
            Line((-204.1811344008, -81.5), (-202.5231668673, -81.5))
            ThreePointArc((-202.5231668673, -81.5), (-201.704014823, -81.0735764364), (-201.5834742465, -80.1579798567))
            Line((-201.5834742465, -80.1579798567), (-242.8998942897, 33.3579512647))
            ThreePointArc((-242.8998942897, 33.3579512647), (-242.866509456, 34.1225896697), (-242.3022218123, 34.6396640288))
            Line((-242.3022218123, 34.6396640288), (-222.5700080617, 41.8216024902))
            ThreePointArc((-222.5700080617, 41.8216024902), (-221.8053696566, 41.7882176564), (-221.2882952976, 41.2239300127))
            Line((-221.2882952976, 41.2239300127), (-176.8599228233, -80.8420201433))
            ThreePointArc((-176.8599228233, -80.8420201433), (-176.4938066389, -81.3191520443), (-175.9202302026, -81.5))
            Line((-175.9202302026, -81.5), (-173.5328145535, -81.5))
            Line((-173.5328145535, -81.5), (-219.7344579026, 45.4379718434))
            Line((-219.7344579026, 45.4379718434), (-165.206104517, 65.2846693993))
            Line((-165.206104517, 65.2846693993), (-168.2128599899, 75.4338674786))
            Line((-168.2128599899, 75.4338674786), (-169.1115203708, 75.1067818492))
            Line((-169.1115203708, 75.1067818492), (-169.1115203708, 74.7875285175))
            Line((-169.1115203708, 74.7875285175), (-291.1801248935, 30.3581899328))
            Line((-291.1801248935, 30.3581899328), (-287.6915194316, 20.7733252008))
            Line((-287.6915194316, 20.7733252008), (-246.8200068386, 35.6493392141))
        make_face()
    extrude(amount=-F3_DEPTH, mode=Mode.SUBTRACT)

    # F2 (on face) → F4 (cut)
    with BuildSketch(Plane(origin=(0, 0, 0), x_dir=(1, 0, 0), z_dir=(0, 0, -1))):
        with Locations((-0.3663900517, 85)):
            Rectangle(F2_W, F2_H)
    extrude(amount=-F4_DEPTH, mode=Mode.SUBTRACT)


solid = f1.part
